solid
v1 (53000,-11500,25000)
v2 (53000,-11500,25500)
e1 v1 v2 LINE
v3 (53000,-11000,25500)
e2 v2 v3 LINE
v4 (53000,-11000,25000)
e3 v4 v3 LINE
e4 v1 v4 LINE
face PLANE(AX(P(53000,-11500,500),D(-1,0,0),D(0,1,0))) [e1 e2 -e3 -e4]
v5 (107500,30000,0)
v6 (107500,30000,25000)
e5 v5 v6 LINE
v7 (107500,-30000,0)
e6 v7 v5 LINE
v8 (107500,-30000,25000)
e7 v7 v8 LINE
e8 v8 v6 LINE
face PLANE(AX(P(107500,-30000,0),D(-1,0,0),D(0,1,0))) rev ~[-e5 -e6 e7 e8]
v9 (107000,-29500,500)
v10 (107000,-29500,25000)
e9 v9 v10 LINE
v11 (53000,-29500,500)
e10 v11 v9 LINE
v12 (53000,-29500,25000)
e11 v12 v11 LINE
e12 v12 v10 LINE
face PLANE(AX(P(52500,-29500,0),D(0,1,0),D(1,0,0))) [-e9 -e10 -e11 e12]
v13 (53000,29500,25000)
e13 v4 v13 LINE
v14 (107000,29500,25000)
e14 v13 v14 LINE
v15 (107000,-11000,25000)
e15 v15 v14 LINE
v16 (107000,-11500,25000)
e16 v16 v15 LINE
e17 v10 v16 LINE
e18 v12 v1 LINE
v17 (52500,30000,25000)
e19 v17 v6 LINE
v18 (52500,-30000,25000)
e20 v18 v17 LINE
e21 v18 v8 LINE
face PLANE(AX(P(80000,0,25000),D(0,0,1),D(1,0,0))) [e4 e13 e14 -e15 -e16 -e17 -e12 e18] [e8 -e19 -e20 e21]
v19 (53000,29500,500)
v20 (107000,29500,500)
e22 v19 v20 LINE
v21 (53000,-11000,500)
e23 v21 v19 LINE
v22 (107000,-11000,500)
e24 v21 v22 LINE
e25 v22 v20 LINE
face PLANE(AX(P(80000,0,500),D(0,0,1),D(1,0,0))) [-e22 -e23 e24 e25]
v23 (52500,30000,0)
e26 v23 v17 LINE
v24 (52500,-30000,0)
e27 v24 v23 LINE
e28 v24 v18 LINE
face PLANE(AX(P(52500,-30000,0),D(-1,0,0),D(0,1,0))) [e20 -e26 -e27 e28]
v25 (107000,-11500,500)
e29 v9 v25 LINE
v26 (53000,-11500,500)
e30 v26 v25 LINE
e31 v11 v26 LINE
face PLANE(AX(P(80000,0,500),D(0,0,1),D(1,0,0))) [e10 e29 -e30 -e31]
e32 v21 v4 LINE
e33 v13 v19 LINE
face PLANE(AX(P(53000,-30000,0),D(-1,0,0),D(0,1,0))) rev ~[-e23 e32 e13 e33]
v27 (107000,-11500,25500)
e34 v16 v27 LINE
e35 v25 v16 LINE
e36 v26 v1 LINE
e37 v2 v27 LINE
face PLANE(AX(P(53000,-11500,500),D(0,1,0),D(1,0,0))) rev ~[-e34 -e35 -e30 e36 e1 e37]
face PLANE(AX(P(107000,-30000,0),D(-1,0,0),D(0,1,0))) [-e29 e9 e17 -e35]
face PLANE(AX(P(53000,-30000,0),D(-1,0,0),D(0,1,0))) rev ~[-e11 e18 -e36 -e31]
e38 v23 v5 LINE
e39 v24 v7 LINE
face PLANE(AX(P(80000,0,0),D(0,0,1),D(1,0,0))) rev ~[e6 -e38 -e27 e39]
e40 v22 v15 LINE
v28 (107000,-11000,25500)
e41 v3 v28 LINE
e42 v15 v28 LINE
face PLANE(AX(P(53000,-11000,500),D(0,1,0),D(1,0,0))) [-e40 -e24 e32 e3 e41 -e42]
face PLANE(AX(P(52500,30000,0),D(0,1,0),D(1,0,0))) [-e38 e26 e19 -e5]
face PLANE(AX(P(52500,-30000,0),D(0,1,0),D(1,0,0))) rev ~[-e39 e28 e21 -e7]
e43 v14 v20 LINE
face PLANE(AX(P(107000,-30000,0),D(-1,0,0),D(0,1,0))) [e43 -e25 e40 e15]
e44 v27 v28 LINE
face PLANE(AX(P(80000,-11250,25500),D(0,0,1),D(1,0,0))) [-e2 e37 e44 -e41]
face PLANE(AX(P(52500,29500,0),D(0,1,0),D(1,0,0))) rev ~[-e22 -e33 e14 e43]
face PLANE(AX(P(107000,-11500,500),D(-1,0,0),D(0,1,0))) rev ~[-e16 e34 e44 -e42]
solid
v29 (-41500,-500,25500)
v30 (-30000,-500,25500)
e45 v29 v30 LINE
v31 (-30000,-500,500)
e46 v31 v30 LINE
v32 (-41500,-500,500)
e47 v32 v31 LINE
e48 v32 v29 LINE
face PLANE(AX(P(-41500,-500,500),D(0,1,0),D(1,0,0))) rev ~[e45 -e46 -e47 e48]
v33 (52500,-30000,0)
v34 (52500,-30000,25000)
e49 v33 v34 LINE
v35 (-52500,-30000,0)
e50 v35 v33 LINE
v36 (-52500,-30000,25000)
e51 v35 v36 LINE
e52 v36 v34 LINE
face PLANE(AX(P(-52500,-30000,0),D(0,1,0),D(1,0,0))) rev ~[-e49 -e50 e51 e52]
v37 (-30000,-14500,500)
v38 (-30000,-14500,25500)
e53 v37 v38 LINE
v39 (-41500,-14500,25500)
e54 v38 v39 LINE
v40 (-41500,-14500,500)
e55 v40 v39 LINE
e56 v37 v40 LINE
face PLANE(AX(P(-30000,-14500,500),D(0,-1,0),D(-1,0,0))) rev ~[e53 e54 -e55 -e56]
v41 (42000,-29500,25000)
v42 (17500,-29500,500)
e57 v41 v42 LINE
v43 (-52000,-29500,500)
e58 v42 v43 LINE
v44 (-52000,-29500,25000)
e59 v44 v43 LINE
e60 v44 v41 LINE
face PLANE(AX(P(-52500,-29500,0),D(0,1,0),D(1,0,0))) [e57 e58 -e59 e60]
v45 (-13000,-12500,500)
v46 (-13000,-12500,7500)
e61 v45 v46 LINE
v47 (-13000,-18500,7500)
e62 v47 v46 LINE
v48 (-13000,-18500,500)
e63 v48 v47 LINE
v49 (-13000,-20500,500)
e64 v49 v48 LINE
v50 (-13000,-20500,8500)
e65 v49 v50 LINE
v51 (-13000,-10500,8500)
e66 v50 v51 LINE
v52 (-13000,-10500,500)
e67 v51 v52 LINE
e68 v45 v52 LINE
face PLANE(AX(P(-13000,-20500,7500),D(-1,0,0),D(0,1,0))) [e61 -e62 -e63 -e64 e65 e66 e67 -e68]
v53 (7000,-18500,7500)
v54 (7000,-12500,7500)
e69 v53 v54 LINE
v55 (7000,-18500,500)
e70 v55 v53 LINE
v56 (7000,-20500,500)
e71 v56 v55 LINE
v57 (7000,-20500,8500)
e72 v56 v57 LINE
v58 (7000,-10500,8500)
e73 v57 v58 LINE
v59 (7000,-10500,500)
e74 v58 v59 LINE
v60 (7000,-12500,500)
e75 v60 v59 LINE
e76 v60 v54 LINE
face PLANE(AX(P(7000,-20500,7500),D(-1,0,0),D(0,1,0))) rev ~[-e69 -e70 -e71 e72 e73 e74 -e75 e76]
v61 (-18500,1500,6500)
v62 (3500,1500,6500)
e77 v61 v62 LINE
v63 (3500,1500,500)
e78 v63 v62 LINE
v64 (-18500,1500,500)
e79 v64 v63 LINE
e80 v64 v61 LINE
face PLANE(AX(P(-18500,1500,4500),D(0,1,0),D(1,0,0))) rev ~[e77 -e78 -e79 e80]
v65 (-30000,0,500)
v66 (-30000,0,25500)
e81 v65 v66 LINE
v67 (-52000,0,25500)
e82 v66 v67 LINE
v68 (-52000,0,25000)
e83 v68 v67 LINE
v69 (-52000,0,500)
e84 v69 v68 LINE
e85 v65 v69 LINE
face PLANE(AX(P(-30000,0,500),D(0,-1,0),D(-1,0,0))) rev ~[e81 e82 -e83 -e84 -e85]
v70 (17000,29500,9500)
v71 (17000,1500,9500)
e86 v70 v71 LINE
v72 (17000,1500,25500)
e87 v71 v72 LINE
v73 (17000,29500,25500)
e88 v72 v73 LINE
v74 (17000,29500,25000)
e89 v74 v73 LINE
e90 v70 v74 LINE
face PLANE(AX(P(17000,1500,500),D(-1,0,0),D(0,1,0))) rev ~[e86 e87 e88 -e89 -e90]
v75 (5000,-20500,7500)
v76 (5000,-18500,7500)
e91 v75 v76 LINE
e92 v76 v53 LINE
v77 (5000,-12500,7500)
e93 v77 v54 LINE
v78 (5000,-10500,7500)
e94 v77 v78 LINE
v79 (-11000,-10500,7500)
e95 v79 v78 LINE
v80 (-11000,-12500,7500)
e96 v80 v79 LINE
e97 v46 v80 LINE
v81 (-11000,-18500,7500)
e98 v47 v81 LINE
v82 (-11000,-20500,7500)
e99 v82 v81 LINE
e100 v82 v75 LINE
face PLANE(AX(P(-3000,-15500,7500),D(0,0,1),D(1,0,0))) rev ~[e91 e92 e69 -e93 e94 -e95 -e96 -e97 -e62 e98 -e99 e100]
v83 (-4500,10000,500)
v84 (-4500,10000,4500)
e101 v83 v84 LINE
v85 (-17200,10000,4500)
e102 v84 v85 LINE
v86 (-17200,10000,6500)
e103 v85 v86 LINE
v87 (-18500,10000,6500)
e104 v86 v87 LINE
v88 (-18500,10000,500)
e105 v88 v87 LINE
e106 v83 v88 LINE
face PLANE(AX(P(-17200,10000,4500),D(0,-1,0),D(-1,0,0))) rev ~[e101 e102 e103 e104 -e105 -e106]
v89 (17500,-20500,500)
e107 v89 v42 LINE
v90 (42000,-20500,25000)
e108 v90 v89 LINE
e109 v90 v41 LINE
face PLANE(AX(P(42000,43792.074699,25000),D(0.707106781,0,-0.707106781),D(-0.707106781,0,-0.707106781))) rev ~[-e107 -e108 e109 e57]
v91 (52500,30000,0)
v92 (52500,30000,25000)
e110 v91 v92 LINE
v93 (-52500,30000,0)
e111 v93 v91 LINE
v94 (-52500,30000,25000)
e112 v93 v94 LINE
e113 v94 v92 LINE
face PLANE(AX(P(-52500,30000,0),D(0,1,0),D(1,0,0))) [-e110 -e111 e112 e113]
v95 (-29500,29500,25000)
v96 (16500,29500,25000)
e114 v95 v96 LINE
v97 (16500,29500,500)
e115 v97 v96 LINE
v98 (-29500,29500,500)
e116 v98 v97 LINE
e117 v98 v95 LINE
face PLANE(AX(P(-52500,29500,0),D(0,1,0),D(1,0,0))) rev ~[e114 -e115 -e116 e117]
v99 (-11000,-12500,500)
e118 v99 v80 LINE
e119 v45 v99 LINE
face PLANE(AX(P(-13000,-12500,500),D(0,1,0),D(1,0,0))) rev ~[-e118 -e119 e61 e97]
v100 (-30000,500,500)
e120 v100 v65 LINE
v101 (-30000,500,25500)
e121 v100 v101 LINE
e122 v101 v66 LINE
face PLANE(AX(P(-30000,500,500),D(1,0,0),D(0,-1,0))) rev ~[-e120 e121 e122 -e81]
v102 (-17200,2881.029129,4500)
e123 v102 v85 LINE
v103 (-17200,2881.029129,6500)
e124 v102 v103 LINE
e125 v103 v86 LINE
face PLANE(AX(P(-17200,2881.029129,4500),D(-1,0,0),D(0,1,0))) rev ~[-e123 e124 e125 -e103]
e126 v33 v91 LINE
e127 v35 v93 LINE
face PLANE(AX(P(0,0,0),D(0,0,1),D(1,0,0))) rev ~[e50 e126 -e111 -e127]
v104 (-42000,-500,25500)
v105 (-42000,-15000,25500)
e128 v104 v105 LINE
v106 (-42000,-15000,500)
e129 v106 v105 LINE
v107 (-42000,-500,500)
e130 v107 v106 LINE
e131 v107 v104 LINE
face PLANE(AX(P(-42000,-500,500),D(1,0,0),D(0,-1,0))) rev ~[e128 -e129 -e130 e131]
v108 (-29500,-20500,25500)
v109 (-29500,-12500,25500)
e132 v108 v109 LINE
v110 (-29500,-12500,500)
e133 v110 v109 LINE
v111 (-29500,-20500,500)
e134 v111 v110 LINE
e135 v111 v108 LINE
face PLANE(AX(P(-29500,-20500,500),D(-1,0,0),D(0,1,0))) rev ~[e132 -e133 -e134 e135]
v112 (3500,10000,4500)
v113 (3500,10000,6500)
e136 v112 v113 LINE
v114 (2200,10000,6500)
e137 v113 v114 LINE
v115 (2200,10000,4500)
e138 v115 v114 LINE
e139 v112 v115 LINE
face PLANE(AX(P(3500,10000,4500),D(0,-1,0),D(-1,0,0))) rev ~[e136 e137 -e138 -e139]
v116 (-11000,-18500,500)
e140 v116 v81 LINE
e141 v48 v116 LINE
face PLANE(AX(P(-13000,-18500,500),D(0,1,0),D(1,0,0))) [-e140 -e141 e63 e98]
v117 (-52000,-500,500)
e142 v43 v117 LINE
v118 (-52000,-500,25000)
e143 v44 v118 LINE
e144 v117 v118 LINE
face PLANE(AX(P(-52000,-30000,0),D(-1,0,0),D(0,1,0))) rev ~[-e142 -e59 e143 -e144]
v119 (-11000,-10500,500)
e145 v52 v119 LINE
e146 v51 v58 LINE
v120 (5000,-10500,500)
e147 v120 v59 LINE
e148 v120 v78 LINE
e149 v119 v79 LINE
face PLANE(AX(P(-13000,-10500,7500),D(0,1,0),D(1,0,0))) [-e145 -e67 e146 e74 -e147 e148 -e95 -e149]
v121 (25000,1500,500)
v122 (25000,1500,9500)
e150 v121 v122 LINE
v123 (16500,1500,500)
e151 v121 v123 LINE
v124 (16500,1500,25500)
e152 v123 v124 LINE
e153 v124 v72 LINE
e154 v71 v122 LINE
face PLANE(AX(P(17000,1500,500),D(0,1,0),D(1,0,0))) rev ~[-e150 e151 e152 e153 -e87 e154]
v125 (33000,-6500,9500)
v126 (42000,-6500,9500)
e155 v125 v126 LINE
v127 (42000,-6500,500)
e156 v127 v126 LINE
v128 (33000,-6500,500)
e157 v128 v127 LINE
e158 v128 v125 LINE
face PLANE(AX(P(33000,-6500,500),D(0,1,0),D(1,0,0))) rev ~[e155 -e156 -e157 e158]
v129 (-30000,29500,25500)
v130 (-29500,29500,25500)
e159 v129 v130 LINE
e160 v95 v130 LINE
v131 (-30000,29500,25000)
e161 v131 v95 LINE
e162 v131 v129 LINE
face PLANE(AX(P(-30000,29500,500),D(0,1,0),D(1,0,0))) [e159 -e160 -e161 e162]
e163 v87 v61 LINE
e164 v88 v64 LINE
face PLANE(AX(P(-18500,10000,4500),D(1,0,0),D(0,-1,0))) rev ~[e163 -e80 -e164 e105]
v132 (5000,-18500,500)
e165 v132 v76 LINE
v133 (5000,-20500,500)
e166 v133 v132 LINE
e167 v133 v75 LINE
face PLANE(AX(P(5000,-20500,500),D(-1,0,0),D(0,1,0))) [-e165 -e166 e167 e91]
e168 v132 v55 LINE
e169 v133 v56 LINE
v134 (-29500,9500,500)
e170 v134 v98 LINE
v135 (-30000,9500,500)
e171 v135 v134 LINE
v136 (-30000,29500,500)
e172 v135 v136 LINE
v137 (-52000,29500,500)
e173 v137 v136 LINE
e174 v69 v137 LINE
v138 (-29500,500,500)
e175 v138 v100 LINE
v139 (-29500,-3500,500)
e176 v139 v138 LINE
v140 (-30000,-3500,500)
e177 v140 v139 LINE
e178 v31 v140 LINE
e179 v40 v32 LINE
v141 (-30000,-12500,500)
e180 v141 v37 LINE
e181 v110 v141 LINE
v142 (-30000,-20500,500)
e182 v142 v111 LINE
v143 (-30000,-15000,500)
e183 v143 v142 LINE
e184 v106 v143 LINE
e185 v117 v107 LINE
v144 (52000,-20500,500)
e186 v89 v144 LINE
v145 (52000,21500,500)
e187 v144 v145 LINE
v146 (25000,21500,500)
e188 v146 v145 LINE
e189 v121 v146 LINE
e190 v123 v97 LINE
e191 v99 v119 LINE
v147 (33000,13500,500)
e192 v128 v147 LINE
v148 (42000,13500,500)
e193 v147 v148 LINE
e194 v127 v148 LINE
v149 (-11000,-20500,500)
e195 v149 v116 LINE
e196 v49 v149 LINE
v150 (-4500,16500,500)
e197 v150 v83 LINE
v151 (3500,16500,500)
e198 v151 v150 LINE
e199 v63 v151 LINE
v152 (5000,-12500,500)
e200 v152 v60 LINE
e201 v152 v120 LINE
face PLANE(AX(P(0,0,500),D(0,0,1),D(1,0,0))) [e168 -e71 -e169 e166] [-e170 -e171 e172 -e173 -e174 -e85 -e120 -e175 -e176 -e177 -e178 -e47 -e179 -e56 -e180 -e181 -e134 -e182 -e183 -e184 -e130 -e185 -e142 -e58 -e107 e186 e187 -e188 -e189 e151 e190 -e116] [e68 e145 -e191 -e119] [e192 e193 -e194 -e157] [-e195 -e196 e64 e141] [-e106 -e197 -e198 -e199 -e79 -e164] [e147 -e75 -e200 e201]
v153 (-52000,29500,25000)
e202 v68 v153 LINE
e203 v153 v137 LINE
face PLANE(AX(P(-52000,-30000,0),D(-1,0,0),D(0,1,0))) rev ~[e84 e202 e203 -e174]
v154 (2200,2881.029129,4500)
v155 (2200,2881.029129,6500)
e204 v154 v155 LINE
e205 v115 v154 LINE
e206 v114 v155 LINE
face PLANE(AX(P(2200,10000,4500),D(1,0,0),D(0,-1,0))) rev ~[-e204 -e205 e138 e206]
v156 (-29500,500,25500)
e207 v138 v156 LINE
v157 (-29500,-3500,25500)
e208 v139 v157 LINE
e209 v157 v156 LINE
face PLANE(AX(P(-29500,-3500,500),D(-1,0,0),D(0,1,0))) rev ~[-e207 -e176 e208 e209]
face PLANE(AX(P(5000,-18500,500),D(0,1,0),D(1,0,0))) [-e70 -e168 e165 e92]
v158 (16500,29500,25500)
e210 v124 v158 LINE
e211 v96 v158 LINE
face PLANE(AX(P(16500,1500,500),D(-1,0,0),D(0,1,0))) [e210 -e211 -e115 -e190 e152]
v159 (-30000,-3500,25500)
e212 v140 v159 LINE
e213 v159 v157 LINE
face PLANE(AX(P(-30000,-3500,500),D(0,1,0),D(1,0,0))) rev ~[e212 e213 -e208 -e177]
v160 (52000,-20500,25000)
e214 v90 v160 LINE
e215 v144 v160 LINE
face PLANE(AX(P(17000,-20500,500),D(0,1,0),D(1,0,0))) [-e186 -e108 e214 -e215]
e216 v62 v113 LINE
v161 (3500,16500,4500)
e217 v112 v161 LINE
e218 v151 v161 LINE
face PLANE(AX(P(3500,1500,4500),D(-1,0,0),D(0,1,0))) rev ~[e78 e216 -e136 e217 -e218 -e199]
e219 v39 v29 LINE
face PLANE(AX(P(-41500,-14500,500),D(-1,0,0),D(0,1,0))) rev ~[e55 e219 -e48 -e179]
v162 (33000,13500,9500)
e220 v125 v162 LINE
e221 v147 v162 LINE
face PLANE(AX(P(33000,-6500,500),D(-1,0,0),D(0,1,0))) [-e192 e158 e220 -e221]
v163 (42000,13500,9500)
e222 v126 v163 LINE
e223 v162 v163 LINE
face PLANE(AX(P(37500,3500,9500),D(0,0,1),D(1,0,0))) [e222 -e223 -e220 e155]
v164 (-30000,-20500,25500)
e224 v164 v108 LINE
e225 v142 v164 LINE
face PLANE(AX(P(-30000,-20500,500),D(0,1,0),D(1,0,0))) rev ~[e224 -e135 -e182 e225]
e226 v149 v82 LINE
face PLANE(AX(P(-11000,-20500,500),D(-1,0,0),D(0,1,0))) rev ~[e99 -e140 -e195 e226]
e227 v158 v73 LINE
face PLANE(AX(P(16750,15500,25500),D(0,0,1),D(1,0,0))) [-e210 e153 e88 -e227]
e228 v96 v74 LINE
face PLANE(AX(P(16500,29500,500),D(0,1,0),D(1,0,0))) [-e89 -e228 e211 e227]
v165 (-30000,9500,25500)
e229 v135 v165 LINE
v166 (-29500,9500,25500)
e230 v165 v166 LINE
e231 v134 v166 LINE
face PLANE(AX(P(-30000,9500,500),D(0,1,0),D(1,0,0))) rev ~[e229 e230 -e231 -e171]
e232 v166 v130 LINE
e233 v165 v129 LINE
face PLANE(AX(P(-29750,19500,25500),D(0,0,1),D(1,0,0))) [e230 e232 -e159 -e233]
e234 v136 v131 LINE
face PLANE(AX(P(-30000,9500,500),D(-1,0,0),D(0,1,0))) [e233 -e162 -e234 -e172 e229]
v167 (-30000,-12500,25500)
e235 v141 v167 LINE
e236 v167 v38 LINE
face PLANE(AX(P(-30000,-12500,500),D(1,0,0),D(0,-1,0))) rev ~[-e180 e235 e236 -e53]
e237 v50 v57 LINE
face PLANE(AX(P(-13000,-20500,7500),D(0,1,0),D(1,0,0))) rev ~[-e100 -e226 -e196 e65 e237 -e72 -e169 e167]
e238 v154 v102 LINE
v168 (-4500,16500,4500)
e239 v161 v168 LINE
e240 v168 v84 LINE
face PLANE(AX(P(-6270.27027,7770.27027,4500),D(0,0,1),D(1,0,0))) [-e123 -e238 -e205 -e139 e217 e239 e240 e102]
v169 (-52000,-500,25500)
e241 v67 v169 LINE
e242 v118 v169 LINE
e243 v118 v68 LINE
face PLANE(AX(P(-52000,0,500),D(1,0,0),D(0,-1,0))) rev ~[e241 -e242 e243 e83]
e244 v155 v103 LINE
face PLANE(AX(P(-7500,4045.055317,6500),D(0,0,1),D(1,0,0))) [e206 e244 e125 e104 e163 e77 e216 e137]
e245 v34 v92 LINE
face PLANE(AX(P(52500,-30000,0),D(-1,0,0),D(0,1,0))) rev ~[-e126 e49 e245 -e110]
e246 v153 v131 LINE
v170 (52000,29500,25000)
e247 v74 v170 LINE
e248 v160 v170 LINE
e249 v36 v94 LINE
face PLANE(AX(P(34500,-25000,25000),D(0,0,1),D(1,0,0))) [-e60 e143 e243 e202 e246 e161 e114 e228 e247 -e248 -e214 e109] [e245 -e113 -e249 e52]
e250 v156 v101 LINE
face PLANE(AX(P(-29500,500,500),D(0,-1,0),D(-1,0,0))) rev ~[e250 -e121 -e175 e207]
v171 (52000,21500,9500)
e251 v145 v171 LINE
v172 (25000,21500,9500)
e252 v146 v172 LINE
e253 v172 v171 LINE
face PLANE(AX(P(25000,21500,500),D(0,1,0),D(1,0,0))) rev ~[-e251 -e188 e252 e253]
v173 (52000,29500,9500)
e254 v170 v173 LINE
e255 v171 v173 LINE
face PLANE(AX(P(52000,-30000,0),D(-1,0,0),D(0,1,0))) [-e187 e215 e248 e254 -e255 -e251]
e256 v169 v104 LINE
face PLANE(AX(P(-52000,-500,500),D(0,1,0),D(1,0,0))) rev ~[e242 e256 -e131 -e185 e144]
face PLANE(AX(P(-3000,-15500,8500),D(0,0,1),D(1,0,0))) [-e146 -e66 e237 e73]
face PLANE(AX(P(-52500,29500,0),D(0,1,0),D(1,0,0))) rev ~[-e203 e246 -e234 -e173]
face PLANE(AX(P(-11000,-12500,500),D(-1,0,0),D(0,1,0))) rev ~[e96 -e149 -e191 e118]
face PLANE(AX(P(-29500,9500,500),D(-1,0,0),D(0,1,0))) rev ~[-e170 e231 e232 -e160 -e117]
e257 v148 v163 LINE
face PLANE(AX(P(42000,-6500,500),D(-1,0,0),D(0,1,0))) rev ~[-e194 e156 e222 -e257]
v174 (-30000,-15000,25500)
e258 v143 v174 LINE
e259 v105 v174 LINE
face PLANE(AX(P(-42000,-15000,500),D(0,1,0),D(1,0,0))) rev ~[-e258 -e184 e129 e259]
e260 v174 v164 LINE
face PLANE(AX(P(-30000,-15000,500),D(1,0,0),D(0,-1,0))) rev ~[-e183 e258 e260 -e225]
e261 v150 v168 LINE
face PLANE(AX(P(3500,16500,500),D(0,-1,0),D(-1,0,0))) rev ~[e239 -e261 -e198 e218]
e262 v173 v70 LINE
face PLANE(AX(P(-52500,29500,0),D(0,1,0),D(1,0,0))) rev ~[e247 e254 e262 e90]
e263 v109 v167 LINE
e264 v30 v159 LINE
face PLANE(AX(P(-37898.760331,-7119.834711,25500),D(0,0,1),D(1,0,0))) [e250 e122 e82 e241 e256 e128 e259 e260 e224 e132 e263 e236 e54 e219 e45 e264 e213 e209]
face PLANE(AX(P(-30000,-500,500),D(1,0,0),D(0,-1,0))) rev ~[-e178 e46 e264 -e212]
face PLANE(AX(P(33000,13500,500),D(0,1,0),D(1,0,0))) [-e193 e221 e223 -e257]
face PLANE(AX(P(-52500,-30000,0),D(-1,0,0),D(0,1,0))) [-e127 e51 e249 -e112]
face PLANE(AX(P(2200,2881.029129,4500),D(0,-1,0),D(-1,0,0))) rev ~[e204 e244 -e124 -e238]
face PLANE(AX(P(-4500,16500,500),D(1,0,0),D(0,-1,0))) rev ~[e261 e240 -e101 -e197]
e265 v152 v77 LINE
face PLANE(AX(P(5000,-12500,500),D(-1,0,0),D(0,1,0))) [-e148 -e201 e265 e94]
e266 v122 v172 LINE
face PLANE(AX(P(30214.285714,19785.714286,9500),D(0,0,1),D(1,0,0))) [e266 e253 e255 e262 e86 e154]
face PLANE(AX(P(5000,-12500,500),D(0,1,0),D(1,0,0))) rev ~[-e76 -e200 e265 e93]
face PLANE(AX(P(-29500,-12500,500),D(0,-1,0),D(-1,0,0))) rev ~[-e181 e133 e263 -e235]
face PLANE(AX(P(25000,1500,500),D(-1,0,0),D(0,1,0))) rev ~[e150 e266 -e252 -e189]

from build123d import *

# Parameters (mm, degrees)
F0_W         = 105000
F0_H         = 60000
F1_DEPTH     = 25000
F2_T         = -500
F3_W         = 500
F3_H         = 20000
F3_H_2       = 28000
F4_DEPTH     = 25000
F5_W         = 9000
F5_H         = 20000
F6_DEPTH     = 9000
F7_W         = 2000
F7_H         = 2000
F8_DEPTH     = 7000
F9_W         = 20000
F9_H         = 10000
F10_DEPTH    = 1000
F12_DEPTH    = 4000
F14_DEPTH    = 2000
F15_W        = 35000
F15_H        = 9000
F16_DEPTH    = 24500
F17_T4_DEPTH = 73292.0746991478
F18_W        = 55000
F18_H        = 60000
F19_DEPTH    = 25000
F20_T        = -500
F21_W        = 54000
F21_H        = 500
F22_DEPTH    = 25000


# Not quite as in the source:
# - a fillet or chamfer that OpenCascade refuses, or shapes differently, is made with other operations: its cross-section is extruded or revolved along the edge and cut away or added


with BuildPart() as f1:
    # F0 (on Top) → F1 (new body)
    with BuildSketch(Plane.XY):
        Rectangle(F0_W, F0_H)
    extrude(amount=F1_DEPTH)

    # F2
    f2_openings = [f1.faces().sort_by_distance(p)[0] for p in [
        (0, 0, 25000),
    ]]
    offset(amount=F2_T, openings=f2_openings)

    # F3 (on face) → F4 (join)
    with BuildSketch(Plane.XY.offset(500)):
        with Locations((-29750, 19500)):
            Rectangle(F3_W, F3_H)
        Polygon((-29500, -3500), (-29500, 500), (-30000, 500), (-30000, 0), (-52000, 0), (-52000, -500), (-42000, -500), (-42000, -15000), (-30000, -15000), (-30000, -20500), (-29500, -20500), (-29500, -12500), (-30000, -12500), (-30000, -14500), (-41500, -14500), (-41500, -500), (-30000, -500), (-30000, -3500), align=None)
        with Locations((16750, 15500)):
            Rectangle(F3_W, F3_H_2)
    extrude(amount=F4_DEPTH)

    # F5 (on face) → F6 (join)
    with BuildSketch(Plane.XY.offset(500)):
        Polygon((17000, 29500), (17000, 1500), (25000, 1500), (25000, 21500), (52000, 21500), (52000, 29500), align=None)
        with Locations((37500, 3500)):
            Rectangle(F5_W, F5_H)
    extrude(amount=F6_DEPTH)

    # F7 (on face) → F8 (join)
    with BuildSketch(Plane.XY.offset(500)):
        with Locations((-12000, -19500)):
            Rectangle(F7_W, F7_H)
        with Locations((-12000, -11500)):
            Rectangle(F7_W, F7_H)
        with Locations((6000, -11500)):
            Rectangle(F7_W, F7_H)
        with Locations((6000, -19500)):
            Rectangle(F7_W, F7_H)
    extrude(amount=F8_DEPTH)

    # F9 (on face) → F10 (join)
    with BuildSketch(Plane.XY.offset(7500)):
        with Locations((-3000, -15500)):
            Rectangle(F9_W, F9_H)
    extrude(amount=F10_DEPTH)

    # F11 (on face) → F12 (join)
    with BuildSketch(Plane.XY.offset(500)):
        Polygon((-4500, 10000), (-18500, 10000), (-18500, 1500), (3500, 1500), (3500, 16500), (-4500, 16500), align=None)
    extrude(amount=F12_DEPTH)

    # F13 (on face) → F14 (join)
    with BuildSketch(Plane.XY.offset(4500)):
        Polygon((-17200, 10000), (-18500, 10000), (-18500, 1500), (3500, 1500), (3500, 10000), (2200, 10000), (2200, 2881.0291290283), (-17200, 2881.0291290283), align=None)
    extrude(amount=F14_DEPTH)

    # F15 (on face) → F16 (join)
    with BuildSketch(Plane.XY.offset(500)):
        with Locations((34500, -25000)):
            Rectangle(F15_W, F15_H)
    extrude(amount=F16_DEPTH)

    # F17: chamfer of 25000 on 1 edges, made by hand


with BuildPart() as f17_tool2:
    # F17_s3 → F17_t4 (new body)
    with BuildSketch(Plane.XZ.offset(-43792.0746991478)):
        Polygon((42000, 25000), (17000, 0), (17000, 25000), align=None)
    extrude(amount=F17_T4_DEPTH)

    split(bisect_by=Plane.XY.offset(500), keep=Keep.TOP)

    split(bisect_by=Plane.XZ.offset(-1500), keep=Keep.TOP)


with BuildPart() as f1_1:
    add(f1.part)

    # F17_t1: cut F17_tool2
    add(f17_tool2.part, mode=Mode.SUBTRACT)


with BuildPart() as f19:
    # F18 (on Top) → F19 (new body)
    with BuildSketch(Plane.XY):
        with Locations((80000, 0)):
            Rectangle(F18_W, F18_H)
    extrude(amount=F19_DEPTH)

    # F20
    f20_openings = [f19.faces().sort_by_distance(p)[0] for p in [
        (80000, 0, 25000),
    ]]
    offset(amount=F20_T, openings=f20_openings)

    # F21 (on face) → F22 (join)
    with BuildSketch(Plane.XY.offset(500)):
        with Locations((80000, -11250)):
            Rectangle(F21_W, F21_H)
    extrude(amount=F22_DEPTH)


solid = Compound([f1_1.part, f19.part])
